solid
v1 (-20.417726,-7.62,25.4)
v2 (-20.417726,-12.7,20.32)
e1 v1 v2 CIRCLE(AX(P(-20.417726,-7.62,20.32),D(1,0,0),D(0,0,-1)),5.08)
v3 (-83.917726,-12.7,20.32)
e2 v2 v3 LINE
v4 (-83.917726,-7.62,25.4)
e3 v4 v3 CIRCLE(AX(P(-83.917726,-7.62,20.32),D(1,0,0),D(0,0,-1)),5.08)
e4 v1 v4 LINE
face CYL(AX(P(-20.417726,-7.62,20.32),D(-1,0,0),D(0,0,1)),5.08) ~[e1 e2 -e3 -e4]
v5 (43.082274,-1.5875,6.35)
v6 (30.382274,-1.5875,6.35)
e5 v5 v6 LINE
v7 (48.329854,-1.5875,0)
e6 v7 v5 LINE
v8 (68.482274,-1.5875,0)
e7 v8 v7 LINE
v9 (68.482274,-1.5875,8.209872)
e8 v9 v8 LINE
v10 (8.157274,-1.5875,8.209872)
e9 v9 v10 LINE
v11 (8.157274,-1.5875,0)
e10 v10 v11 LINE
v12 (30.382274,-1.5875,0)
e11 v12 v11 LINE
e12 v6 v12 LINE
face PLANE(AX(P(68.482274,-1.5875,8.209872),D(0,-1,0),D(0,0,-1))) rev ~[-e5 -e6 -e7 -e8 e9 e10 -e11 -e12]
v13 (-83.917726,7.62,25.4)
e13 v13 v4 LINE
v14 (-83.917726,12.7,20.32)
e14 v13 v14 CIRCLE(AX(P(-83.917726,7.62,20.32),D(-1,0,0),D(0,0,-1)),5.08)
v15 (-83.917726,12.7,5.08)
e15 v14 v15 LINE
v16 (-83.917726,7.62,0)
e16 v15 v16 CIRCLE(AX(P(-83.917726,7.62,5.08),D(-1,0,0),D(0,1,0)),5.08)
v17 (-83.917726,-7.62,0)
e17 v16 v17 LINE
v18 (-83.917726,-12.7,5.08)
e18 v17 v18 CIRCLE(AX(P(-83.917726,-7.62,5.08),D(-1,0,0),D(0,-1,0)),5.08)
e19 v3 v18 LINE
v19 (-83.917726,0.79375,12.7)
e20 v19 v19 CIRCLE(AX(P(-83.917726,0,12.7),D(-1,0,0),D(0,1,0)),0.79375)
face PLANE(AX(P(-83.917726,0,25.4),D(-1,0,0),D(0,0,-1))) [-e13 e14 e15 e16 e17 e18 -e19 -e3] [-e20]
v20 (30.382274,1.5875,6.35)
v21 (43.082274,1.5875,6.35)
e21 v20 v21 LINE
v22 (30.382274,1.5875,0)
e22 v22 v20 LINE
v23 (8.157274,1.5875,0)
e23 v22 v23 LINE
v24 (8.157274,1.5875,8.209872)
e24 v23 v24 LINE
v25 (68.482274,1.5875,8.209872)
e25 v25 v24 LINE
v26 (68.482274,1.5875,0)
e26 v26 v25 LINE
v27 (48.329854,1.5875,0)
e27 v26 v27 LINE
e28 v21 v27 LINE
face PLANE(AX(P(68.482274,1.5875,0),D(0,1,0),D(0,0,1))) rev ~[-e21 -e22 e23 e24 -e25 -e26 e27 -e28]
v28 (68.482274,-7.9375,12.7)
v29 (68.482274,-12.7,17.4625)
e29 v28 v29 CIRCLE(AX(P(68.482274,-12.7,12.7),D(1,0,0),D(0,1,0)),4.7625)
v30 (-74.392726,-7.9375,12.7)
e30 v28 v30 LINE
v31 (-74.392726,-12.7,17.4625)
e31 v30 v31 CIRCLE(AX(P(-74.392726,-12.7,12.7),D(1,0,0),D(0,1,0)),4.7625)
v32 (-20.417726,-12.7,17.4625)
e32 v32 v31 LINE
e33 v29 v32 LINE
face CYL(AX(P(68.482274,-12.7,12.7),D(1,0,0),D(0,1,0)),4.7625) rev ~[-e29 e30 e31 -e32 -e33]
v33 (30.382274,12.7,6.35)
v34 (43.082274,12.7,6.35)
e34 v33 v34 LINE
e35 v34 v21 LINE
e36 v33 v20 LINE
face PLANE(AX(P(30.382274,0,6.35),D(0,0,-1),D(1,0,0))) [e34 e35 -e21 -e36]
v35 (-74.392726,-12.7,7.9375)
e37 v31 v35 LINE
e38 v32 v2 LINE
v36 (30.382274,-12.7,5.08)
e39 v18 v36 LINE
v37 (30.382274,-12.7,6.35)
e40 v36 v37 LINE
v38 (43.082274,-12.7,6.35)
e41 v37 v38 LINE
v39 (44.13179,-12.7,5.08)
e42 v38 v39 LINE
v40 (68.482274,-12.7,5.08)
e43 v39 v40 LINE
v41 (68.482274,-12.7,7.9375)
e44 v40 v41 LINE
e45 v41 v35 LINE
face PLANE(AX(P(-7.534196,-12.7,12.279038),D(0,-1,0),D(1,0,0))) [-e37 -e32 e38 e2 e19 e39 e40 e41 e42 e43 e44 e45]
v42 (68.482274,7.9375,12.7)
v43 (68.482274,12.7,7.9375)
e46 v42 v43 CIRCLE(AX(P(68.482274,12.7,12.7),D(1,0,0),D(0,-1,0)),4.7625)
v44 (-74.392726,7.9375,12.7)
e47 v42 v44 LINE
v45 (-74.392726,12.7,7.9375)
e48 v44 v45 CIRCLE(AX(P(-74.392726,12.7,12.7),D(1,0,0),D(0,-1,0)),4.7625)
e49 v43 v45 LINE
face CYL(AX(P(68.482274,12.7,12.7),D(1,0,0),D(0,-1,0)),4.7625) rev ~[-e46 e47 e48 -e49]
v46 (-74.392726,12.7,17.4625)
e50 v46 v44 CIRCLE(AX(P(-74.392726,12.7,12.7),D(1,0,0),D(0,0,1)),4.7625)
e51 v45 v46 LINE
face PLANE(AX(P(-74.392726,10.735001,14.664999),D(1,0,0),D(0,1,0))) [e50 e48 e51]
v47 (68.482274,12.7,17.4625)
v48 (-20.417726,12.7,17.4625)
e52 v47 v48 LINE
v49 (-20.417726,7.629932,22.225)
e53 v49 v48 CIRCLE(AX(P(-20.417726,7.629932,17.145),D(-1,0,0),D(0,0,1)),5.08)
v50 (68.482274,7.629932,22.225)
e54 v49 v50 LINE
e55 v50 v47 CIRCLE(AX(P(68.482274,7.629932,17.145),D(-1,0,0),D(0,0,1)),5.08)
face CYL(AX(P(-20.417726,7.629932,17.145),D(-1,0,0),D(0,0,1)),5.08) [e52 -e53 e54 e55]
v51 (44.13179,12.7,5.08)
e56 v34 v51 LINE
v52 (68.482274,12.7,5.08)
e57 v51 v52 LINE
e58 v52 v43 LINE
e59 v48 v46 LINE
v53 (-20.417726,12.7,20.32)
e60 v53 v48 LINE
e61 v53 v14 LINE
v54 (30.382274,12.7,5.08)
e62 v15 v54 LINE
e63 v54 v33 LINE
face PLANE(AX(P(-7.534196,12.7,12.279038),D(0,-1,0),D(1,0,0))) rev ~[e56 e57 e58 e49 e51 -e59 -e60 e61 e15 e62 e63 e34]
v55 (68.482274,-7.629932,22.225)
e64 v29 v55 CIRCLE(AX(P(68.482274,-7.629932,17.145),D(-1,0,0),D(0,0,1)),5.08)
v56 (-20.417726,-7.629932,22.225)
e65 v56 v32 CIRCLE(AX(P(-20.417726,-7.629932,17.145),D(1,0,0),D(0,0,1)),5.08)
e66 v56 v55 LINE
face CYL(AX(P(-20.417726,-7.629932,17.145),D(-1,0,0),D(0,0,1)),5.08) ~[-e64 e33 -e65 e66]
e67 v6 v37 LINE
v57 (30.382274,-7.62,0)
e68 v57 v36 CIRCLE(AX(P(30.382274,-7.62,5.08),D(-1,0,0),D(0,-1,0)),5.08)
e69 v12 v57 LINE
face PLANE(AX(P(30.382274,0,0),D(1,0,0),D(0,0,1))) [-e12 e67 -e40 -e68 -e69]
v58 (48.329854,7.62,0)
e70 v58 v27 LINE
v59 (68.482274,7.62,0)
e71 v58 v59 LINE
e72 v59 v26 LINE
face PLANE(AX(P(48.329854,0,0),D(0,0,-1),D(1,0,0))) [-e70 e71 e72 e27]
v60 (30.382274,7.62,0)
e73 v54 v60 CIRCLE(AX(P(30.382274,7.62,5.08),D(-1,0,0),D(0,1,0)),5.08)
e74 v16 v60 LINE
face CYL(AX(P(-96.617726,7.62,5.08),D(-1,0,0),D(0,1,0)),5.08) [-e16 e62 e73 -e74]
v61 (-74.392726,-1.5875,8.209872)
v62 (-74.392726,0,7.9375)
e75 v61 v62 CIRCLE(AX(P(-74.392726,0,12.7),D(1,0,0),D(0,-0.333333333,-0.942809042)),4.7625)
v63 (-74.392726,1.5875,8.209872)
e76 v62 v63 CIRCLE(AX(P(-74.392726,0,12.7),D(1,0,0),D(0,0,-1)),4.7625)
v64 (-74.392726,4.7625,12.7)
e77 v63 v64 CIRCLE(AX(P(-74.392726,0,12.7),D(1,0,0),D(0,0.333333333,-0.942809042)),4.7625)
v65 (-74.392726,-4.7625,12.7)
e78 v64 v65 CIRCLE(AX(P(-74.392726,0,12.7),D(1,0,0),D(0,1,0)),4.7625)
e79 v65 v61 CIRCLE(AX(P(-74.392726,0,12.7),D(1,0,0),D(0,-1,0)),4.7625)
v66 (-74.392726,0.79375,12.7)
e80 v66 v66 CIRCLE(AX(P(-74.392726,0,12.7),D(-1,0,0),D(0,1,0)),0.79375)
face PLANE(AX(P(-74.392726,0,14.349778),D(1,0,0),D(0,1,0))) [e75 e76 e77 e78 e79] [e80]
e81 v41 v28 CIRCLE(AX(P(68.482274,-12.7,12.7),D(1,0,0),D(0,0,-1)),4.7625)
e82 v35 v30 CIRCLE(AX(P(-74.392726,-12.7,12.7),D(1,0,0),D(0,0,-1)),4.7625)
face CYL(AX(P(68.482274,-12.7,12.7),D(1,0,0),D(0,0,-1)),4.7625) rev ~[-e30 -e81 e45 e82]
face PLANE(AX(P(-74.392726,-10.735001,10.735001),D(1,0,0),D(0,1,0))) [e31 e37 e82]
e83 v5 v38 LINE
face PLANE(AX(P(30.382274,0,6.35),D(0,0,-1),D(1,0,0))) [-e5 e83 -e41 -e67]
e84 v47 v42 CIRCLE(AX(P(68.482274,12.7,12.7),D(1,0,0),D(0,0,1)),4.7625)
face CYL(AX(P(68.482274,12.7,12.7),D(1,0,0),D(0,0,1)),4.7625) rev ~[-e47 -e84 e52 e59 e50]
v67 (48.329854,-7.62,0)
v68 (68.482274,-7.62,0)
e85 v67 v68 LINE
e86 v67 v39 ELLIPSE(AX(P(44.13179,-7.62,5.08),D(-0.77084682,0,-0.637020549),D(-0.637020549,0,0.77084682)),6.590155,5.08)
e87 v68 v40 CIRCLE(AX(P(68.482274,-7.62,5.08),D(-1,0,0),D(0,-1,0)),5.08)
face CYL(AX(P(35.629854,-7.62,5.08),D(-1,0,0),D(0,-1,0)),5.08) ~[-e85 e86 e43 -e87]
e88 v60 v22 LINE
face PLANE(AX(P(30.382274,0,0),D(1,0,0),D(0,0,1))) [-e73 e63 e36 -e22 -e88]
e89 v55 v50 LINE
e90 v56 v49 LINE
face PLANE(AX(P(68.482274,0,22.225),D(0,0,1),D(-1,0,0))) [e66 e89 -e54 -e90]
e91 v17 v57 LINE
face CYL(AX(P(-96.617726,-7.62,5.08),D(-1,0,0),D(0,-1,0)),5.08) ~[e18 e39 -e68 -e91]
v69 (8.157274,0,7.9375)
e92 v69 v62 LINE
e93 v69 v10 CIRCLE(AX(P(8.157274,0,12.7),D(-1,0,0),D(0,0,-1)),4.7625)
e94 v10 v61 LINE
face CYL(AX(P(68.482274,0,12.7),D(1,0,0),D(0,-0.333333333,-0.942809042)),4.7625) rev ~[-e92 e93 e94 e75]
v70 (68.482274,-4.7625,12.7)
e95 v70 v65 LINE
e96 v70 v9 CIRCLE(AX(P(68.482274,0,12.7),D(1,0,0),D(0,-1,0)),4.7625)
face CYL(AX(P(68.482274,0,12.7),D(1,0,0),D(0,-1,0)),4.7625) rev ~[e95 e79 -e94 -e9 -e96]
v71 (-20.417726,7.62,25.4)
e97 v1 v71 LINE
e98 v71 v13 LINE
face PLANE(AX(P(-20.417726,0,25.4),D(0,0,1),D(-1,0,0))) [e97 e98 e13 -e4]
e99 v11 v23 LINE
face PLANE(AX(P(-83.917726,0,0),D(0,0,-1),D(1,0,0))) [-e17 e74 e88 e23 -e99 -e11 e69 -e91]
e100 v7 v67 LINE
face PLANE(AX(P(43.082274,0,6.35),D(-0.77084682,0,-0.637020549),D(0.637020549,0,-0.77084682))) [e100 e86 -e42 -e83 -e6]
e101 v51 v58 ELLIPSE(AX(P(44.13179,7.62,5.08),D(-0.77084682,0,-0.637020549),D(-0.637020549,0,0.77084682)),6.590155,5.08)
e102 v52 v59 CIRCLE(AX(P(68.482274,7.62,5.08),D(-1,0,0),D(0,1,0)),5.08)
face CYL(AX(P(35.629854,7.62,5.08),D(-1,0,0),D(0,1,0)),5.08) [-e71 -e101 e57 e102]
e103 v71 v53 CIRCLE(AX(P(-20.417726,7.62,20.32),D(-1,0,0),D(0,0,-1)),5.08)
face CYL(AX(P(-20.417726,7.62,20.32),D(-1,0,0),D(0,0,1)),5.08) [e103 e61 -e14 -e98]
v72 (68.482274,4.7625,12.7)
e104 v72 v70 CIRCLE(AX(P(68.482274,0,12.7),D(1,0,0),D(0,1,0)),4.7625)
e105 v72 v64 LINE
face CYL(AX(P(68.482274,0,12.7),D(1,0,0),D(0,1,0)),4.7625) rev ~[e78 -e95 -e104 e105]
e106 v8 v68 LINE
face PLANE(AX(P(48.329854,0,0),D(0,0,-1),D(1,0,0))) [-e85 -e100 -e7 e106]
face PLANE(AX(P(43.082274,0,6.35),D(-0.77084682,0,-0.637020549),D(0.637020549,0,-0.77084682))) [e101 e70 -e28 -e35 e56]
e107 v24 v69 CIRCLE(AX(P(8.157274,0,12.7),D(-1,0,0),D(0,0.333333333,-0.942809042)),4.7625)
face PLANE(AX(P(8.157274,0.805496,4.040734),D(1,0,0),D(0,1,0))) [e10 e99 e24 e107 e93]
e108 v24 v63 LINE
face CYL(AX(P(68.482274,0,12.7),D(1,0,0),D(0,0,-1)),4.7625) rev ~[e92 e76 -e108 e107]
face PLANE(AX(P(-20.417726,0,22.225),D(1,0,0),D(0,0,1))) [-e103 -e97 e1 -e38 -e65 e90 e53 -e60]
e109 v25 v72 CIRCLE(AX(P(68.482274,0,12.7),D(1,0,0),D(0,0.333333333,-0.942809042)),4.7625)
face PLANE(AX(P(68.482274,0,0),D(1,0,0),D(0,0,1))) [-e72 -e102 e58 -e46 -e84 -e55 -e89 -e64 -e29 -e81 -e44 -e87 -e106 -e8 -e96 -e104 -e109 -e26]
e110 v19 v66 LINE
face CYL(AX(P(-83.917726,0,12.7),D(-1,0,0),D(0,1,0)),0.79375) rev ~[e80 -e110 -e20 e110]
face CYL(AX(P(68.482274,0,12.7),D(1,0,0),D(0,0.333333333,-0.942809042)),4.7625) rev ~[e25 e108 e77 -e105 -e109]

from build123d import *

# Parameters (mm, degrees)
F0_W        = 142.875
F0_H        = 9.525
F1_DEPTH    = 12.7
F3_DEPTH    = 142.875
F5_DEPTH    = 9.525
F6_DEPTH    = 142.875
F7_T1_DEPTH = 101.5751710417
F7_T3_DEPTH = 45.552419836
F7_T5_DEPTH = 139.7
F8_R        = 5.08
F9_DEPTH    = 60.325


# Not quite as in the source:
# - a fillet or chamfer that OpenCascade refuses, or shapes differently, is made with other operations: its cross-section is extruded or revolved along the edge and cut away or added


with BuildPart() as f1:
    # F0 (on Front) → F1 (new body, symmetric)
    with BuildSketch(Plane.XZ):
        Polygon((-20.4177256674, 25.4), (-83.9177256674, 25.4), (-83.9177256674, 0), (30.3822743326, 0), (30.3822743326, 6.35), (43.0822743326, 6.35), (48.3298544966, 0), (68.4822743326, 0), (68.4822743326, 7.9375), (-74.3927256674, 7.9375), (-74.3927256674, 17.4625), (68.4822743326, 17.4625), (68.4822743326, 22.225), (-20.4177256674, 22.225), align=None)
        with Locations((-2.9552256674, 12.7)):
            Rectangle(F0_W, F0_H)
    extrude(amount=F1_DEPTH, both=True)

    # F2 (on face) → F3 (cut)
    with BuildSketch(Plane.YZ.offset(68.4822743326)):
        with BuildLine():
            Line((-4.7625, 12.7), (0, 12.7))
            Line((0, 12.7), (4.7625, 12.7))
            ThreePointArc((4.7625, 12.7), (0, 17.4625), (-4.7625, 12.7))
        make_face()
        with BuildLine():
            Line((-1.5875, 8.2098719395), (0, 8.2098719395))
            Line((0, 8.2098719395), (0, 12.7))
            Line((0, 12.7), (-4.7625, 12.7))
            ThreePointArc((-4.7625, 12.7), (-3.8885649667, 9.950369343), (-1.5875, 8.2098719395))
        make_face()
        with BuildLine():
            ThreePointArc((-1.5875, 8.2098719395), (-0.8053481737, 8.0060868597), (0, 7.9375))
            Line((0, 7.9375), (0, 8.2098719395))
            Line((0, 8.2098719395), (-1.5875, 8.2098719395))
        make_face()
        with BuildLine():
            Line((0, 8.2098719395), (0, 7.9375))
            ThreePointArc((0, 7.9375), (0.8053481737, 8.0060868597), (1.5875, 8.2098719395))
            Line((1.5875, 8.2098719395), (0, 8.2098719395))
        make_face()
        with BuildLine():
            Line((0, 12.7), (0, 8.2098719395))
            Line((0, 8.2098719395), (1.5875, 8.2098719395))
            ThreePointArc((1.5875, 8.2098719395), (3.8885649667, 9.950369343), (4.7625, 12.7))
            Line((4.7625, 12.7), (0, 12.7))
        make_face()
    extrude(amount=-F3_DEPTH, mode=Mode.SUBTRACT)

    # F4 (on face) → F5 (cut)
    with BuildSketch(Plane(origin=(-83.9177256674, 0, 0), x_dir=(0, -1, 0), z_dir=(-1, 0, 0))):
        with BuildLine():
            Line((-0.79375, 12.7), (0.79375, 12.7))
            ThreePointArc((0.79375, 12.7), (0, 13.49375), (-0.79375, 12.7))
        make_face()
        with BuildLine():
            ThreePointArc((-0.79375, 12.7), (0, 11.90625), (0.79375, 12.7))
            Line((0.79375, 12.7), (-0.79375, 12.7))
        make_face()
    extrude(amount=-F5_DEPTH, mode=Mode.SUBTRACT)

    # F2 (on face) → F6 (cut)
    with BuildSketch(Plane.YZ.offset(68.4822743326)):
        with BuildLine():
            ThreePointArc((12.7, 17.4625), (9.3324039546, 16.0675960454), (7.9375, 12.7))
            Line((7.9375, 12.7), (12.7, 12.7))
            Line((12.7, 12.7), (12.7, 17.4625))
        make_face()
        with BuildLine():
            ThreePointArc((7.9375, 12.7), (9.3324039546, 9.3324039546), (12.7, 7.9375))
            Line((12.7, 7.9375), (12.7, 12.7))
            Line((12.7, 12.7), (7.9375, 12.7))
        make_face()
        with BuildLine():
            Line((-12.7, 12.7), (-12.7, 7.9375))
            ThreePointArc((-12.7, 7.9375), (-9.3324039546, 9.3324039546), (-7.9375, 12.7))
            Line((-7.9375, 12.7), (-12.7, 12.7))
        make_face()
        with BuildLine():
            Line((-12.7, 12.7), (-7.9375, 12.7))
            ThreePointArc((-7.9375, 12.7), (-9.3324039546, 16.0675960454), (-12.7, 17.4625))
            Line((-12.7, 17.4625), (-12.7, 12.7))
        make_face()
    extrude(amount=-F6_DEPTH, mode=Mode.SUBTRACT)

    # F7: fillet of radius 5.08 on 6 edges, made by hand

    # F7_s2 → F7_t1 (cut)
    with BuildSketch(Plane.YZ.offset(-20.4177256674)):
        with BuildLine():
            ThreePointArc((7.6299315833, 22.225), (11.1079698235, 20.8476544532), (12.7, 17.4625))
            Line((12.7, 17.4625), (12.7, 22.225))
            Line((12.7, 22.225), (7.6299315833, 22.225))
        make_face()
        with BuildLine():
            ThreePointArc((-7.6299315833, 22.225), (-11.1079698235, 20.8476544532), (-12.7, 17.4625))
            Line((-12.7, 17.4625), (-12.7, 22.225))
            Line((-12.7, 22.225), (-7.6299315833, 22.225))
        make_face()
    extrude(amount=F7_T1_DEPTH, mode=Mode.SUBTRACT)

    # F7_s4 → F7_t3 (cut)
    with BuildSketch(Plane.YZ.offset(35.6298544966)):
        with BuildLine():
            ThreePointArc((12.7, 5.08), (11.2121024484, 1.4878975516), (7.62, 0))
            Line((7.62, 0), (12.7, 0))
            Line((12.7, 0), (12.7, 5.08))
        make_face()
        with BuildLine():
            ThreePointArc((-12.7, 5.08), (-11.2121024484, 1.4878975516), (-7.62, 0))
            Line((-7.62, 0), (-12.7, 0))
            Line((-12.7, 0), (-12.7, 5.08))
        make_face()
    extrude(amount=F7_T3_DEPTH, mode=Mode.SUBTRACT)

    # F7_s6 → F7_t5 (cut)
    with BuildSketch(Plane.YZ.offset(-96.6177256674)):
        with BuildLine():
            ThreePointArc((-12.7, 5.08), (-11.2121024484, 1.4878975516), (-7.62, 0))
            Line((-7.62, 0), (-12.7, 0))
            Line((-12.7, 0), (-12.7, 5.08))
        make_face()
        with BuildLine():
            ThreePointArc((12.7, 5.08), (11.2121024484, 1.4878975516), (7.62, 0))
            Line((7.62, 0), (12.7, 0))
            Line((12.7, 0), (12.7, 5.08))
        make_face()
    extrude(amount=F7_T5_DEPTH, mode=Mode.SUBTRACT)

    # F8
    f8_edges = [f1.edges().sort_by_distance(p)[0] for p in [
        (-52.167726, 12.7, 25.4),
        (-52.167726, -12.7, 25.4),
    ]]
    fillet(f8_edges, radius=F8_R)

    # F2 (on face) → F9 (cut)
    with BuildSketch(Plane.YZ.offset(68.4822743326)):
        with BuildLine():
            Line((0, 7.9375), (0, 0))
            Line((0, 0), (1.5875, 0))
            Line((1.5875, 0), (1.5875, 8.2098719395))
            ThreePointArc((1.5875, 8.2098719395), (0.8053481737, 8.0060868597), (0, 7.9375))
        make_face()
        with BuildLine():
            Line((-1.5875, 0), (0, 0))
            Line((0, 0), (0, 7.9375))
            ThreePointArc((0, 7.9375), (-0.8053481737, 8.0060868597), (-1.5875, 8.2098719395))
            Line((-1.5875, 8.2098719395), (-1.5875, 0))
        make_face()
    extrude(amount=-F9_DEPTH, mode=Mode.SUBTRACT)


solid = f1.part
